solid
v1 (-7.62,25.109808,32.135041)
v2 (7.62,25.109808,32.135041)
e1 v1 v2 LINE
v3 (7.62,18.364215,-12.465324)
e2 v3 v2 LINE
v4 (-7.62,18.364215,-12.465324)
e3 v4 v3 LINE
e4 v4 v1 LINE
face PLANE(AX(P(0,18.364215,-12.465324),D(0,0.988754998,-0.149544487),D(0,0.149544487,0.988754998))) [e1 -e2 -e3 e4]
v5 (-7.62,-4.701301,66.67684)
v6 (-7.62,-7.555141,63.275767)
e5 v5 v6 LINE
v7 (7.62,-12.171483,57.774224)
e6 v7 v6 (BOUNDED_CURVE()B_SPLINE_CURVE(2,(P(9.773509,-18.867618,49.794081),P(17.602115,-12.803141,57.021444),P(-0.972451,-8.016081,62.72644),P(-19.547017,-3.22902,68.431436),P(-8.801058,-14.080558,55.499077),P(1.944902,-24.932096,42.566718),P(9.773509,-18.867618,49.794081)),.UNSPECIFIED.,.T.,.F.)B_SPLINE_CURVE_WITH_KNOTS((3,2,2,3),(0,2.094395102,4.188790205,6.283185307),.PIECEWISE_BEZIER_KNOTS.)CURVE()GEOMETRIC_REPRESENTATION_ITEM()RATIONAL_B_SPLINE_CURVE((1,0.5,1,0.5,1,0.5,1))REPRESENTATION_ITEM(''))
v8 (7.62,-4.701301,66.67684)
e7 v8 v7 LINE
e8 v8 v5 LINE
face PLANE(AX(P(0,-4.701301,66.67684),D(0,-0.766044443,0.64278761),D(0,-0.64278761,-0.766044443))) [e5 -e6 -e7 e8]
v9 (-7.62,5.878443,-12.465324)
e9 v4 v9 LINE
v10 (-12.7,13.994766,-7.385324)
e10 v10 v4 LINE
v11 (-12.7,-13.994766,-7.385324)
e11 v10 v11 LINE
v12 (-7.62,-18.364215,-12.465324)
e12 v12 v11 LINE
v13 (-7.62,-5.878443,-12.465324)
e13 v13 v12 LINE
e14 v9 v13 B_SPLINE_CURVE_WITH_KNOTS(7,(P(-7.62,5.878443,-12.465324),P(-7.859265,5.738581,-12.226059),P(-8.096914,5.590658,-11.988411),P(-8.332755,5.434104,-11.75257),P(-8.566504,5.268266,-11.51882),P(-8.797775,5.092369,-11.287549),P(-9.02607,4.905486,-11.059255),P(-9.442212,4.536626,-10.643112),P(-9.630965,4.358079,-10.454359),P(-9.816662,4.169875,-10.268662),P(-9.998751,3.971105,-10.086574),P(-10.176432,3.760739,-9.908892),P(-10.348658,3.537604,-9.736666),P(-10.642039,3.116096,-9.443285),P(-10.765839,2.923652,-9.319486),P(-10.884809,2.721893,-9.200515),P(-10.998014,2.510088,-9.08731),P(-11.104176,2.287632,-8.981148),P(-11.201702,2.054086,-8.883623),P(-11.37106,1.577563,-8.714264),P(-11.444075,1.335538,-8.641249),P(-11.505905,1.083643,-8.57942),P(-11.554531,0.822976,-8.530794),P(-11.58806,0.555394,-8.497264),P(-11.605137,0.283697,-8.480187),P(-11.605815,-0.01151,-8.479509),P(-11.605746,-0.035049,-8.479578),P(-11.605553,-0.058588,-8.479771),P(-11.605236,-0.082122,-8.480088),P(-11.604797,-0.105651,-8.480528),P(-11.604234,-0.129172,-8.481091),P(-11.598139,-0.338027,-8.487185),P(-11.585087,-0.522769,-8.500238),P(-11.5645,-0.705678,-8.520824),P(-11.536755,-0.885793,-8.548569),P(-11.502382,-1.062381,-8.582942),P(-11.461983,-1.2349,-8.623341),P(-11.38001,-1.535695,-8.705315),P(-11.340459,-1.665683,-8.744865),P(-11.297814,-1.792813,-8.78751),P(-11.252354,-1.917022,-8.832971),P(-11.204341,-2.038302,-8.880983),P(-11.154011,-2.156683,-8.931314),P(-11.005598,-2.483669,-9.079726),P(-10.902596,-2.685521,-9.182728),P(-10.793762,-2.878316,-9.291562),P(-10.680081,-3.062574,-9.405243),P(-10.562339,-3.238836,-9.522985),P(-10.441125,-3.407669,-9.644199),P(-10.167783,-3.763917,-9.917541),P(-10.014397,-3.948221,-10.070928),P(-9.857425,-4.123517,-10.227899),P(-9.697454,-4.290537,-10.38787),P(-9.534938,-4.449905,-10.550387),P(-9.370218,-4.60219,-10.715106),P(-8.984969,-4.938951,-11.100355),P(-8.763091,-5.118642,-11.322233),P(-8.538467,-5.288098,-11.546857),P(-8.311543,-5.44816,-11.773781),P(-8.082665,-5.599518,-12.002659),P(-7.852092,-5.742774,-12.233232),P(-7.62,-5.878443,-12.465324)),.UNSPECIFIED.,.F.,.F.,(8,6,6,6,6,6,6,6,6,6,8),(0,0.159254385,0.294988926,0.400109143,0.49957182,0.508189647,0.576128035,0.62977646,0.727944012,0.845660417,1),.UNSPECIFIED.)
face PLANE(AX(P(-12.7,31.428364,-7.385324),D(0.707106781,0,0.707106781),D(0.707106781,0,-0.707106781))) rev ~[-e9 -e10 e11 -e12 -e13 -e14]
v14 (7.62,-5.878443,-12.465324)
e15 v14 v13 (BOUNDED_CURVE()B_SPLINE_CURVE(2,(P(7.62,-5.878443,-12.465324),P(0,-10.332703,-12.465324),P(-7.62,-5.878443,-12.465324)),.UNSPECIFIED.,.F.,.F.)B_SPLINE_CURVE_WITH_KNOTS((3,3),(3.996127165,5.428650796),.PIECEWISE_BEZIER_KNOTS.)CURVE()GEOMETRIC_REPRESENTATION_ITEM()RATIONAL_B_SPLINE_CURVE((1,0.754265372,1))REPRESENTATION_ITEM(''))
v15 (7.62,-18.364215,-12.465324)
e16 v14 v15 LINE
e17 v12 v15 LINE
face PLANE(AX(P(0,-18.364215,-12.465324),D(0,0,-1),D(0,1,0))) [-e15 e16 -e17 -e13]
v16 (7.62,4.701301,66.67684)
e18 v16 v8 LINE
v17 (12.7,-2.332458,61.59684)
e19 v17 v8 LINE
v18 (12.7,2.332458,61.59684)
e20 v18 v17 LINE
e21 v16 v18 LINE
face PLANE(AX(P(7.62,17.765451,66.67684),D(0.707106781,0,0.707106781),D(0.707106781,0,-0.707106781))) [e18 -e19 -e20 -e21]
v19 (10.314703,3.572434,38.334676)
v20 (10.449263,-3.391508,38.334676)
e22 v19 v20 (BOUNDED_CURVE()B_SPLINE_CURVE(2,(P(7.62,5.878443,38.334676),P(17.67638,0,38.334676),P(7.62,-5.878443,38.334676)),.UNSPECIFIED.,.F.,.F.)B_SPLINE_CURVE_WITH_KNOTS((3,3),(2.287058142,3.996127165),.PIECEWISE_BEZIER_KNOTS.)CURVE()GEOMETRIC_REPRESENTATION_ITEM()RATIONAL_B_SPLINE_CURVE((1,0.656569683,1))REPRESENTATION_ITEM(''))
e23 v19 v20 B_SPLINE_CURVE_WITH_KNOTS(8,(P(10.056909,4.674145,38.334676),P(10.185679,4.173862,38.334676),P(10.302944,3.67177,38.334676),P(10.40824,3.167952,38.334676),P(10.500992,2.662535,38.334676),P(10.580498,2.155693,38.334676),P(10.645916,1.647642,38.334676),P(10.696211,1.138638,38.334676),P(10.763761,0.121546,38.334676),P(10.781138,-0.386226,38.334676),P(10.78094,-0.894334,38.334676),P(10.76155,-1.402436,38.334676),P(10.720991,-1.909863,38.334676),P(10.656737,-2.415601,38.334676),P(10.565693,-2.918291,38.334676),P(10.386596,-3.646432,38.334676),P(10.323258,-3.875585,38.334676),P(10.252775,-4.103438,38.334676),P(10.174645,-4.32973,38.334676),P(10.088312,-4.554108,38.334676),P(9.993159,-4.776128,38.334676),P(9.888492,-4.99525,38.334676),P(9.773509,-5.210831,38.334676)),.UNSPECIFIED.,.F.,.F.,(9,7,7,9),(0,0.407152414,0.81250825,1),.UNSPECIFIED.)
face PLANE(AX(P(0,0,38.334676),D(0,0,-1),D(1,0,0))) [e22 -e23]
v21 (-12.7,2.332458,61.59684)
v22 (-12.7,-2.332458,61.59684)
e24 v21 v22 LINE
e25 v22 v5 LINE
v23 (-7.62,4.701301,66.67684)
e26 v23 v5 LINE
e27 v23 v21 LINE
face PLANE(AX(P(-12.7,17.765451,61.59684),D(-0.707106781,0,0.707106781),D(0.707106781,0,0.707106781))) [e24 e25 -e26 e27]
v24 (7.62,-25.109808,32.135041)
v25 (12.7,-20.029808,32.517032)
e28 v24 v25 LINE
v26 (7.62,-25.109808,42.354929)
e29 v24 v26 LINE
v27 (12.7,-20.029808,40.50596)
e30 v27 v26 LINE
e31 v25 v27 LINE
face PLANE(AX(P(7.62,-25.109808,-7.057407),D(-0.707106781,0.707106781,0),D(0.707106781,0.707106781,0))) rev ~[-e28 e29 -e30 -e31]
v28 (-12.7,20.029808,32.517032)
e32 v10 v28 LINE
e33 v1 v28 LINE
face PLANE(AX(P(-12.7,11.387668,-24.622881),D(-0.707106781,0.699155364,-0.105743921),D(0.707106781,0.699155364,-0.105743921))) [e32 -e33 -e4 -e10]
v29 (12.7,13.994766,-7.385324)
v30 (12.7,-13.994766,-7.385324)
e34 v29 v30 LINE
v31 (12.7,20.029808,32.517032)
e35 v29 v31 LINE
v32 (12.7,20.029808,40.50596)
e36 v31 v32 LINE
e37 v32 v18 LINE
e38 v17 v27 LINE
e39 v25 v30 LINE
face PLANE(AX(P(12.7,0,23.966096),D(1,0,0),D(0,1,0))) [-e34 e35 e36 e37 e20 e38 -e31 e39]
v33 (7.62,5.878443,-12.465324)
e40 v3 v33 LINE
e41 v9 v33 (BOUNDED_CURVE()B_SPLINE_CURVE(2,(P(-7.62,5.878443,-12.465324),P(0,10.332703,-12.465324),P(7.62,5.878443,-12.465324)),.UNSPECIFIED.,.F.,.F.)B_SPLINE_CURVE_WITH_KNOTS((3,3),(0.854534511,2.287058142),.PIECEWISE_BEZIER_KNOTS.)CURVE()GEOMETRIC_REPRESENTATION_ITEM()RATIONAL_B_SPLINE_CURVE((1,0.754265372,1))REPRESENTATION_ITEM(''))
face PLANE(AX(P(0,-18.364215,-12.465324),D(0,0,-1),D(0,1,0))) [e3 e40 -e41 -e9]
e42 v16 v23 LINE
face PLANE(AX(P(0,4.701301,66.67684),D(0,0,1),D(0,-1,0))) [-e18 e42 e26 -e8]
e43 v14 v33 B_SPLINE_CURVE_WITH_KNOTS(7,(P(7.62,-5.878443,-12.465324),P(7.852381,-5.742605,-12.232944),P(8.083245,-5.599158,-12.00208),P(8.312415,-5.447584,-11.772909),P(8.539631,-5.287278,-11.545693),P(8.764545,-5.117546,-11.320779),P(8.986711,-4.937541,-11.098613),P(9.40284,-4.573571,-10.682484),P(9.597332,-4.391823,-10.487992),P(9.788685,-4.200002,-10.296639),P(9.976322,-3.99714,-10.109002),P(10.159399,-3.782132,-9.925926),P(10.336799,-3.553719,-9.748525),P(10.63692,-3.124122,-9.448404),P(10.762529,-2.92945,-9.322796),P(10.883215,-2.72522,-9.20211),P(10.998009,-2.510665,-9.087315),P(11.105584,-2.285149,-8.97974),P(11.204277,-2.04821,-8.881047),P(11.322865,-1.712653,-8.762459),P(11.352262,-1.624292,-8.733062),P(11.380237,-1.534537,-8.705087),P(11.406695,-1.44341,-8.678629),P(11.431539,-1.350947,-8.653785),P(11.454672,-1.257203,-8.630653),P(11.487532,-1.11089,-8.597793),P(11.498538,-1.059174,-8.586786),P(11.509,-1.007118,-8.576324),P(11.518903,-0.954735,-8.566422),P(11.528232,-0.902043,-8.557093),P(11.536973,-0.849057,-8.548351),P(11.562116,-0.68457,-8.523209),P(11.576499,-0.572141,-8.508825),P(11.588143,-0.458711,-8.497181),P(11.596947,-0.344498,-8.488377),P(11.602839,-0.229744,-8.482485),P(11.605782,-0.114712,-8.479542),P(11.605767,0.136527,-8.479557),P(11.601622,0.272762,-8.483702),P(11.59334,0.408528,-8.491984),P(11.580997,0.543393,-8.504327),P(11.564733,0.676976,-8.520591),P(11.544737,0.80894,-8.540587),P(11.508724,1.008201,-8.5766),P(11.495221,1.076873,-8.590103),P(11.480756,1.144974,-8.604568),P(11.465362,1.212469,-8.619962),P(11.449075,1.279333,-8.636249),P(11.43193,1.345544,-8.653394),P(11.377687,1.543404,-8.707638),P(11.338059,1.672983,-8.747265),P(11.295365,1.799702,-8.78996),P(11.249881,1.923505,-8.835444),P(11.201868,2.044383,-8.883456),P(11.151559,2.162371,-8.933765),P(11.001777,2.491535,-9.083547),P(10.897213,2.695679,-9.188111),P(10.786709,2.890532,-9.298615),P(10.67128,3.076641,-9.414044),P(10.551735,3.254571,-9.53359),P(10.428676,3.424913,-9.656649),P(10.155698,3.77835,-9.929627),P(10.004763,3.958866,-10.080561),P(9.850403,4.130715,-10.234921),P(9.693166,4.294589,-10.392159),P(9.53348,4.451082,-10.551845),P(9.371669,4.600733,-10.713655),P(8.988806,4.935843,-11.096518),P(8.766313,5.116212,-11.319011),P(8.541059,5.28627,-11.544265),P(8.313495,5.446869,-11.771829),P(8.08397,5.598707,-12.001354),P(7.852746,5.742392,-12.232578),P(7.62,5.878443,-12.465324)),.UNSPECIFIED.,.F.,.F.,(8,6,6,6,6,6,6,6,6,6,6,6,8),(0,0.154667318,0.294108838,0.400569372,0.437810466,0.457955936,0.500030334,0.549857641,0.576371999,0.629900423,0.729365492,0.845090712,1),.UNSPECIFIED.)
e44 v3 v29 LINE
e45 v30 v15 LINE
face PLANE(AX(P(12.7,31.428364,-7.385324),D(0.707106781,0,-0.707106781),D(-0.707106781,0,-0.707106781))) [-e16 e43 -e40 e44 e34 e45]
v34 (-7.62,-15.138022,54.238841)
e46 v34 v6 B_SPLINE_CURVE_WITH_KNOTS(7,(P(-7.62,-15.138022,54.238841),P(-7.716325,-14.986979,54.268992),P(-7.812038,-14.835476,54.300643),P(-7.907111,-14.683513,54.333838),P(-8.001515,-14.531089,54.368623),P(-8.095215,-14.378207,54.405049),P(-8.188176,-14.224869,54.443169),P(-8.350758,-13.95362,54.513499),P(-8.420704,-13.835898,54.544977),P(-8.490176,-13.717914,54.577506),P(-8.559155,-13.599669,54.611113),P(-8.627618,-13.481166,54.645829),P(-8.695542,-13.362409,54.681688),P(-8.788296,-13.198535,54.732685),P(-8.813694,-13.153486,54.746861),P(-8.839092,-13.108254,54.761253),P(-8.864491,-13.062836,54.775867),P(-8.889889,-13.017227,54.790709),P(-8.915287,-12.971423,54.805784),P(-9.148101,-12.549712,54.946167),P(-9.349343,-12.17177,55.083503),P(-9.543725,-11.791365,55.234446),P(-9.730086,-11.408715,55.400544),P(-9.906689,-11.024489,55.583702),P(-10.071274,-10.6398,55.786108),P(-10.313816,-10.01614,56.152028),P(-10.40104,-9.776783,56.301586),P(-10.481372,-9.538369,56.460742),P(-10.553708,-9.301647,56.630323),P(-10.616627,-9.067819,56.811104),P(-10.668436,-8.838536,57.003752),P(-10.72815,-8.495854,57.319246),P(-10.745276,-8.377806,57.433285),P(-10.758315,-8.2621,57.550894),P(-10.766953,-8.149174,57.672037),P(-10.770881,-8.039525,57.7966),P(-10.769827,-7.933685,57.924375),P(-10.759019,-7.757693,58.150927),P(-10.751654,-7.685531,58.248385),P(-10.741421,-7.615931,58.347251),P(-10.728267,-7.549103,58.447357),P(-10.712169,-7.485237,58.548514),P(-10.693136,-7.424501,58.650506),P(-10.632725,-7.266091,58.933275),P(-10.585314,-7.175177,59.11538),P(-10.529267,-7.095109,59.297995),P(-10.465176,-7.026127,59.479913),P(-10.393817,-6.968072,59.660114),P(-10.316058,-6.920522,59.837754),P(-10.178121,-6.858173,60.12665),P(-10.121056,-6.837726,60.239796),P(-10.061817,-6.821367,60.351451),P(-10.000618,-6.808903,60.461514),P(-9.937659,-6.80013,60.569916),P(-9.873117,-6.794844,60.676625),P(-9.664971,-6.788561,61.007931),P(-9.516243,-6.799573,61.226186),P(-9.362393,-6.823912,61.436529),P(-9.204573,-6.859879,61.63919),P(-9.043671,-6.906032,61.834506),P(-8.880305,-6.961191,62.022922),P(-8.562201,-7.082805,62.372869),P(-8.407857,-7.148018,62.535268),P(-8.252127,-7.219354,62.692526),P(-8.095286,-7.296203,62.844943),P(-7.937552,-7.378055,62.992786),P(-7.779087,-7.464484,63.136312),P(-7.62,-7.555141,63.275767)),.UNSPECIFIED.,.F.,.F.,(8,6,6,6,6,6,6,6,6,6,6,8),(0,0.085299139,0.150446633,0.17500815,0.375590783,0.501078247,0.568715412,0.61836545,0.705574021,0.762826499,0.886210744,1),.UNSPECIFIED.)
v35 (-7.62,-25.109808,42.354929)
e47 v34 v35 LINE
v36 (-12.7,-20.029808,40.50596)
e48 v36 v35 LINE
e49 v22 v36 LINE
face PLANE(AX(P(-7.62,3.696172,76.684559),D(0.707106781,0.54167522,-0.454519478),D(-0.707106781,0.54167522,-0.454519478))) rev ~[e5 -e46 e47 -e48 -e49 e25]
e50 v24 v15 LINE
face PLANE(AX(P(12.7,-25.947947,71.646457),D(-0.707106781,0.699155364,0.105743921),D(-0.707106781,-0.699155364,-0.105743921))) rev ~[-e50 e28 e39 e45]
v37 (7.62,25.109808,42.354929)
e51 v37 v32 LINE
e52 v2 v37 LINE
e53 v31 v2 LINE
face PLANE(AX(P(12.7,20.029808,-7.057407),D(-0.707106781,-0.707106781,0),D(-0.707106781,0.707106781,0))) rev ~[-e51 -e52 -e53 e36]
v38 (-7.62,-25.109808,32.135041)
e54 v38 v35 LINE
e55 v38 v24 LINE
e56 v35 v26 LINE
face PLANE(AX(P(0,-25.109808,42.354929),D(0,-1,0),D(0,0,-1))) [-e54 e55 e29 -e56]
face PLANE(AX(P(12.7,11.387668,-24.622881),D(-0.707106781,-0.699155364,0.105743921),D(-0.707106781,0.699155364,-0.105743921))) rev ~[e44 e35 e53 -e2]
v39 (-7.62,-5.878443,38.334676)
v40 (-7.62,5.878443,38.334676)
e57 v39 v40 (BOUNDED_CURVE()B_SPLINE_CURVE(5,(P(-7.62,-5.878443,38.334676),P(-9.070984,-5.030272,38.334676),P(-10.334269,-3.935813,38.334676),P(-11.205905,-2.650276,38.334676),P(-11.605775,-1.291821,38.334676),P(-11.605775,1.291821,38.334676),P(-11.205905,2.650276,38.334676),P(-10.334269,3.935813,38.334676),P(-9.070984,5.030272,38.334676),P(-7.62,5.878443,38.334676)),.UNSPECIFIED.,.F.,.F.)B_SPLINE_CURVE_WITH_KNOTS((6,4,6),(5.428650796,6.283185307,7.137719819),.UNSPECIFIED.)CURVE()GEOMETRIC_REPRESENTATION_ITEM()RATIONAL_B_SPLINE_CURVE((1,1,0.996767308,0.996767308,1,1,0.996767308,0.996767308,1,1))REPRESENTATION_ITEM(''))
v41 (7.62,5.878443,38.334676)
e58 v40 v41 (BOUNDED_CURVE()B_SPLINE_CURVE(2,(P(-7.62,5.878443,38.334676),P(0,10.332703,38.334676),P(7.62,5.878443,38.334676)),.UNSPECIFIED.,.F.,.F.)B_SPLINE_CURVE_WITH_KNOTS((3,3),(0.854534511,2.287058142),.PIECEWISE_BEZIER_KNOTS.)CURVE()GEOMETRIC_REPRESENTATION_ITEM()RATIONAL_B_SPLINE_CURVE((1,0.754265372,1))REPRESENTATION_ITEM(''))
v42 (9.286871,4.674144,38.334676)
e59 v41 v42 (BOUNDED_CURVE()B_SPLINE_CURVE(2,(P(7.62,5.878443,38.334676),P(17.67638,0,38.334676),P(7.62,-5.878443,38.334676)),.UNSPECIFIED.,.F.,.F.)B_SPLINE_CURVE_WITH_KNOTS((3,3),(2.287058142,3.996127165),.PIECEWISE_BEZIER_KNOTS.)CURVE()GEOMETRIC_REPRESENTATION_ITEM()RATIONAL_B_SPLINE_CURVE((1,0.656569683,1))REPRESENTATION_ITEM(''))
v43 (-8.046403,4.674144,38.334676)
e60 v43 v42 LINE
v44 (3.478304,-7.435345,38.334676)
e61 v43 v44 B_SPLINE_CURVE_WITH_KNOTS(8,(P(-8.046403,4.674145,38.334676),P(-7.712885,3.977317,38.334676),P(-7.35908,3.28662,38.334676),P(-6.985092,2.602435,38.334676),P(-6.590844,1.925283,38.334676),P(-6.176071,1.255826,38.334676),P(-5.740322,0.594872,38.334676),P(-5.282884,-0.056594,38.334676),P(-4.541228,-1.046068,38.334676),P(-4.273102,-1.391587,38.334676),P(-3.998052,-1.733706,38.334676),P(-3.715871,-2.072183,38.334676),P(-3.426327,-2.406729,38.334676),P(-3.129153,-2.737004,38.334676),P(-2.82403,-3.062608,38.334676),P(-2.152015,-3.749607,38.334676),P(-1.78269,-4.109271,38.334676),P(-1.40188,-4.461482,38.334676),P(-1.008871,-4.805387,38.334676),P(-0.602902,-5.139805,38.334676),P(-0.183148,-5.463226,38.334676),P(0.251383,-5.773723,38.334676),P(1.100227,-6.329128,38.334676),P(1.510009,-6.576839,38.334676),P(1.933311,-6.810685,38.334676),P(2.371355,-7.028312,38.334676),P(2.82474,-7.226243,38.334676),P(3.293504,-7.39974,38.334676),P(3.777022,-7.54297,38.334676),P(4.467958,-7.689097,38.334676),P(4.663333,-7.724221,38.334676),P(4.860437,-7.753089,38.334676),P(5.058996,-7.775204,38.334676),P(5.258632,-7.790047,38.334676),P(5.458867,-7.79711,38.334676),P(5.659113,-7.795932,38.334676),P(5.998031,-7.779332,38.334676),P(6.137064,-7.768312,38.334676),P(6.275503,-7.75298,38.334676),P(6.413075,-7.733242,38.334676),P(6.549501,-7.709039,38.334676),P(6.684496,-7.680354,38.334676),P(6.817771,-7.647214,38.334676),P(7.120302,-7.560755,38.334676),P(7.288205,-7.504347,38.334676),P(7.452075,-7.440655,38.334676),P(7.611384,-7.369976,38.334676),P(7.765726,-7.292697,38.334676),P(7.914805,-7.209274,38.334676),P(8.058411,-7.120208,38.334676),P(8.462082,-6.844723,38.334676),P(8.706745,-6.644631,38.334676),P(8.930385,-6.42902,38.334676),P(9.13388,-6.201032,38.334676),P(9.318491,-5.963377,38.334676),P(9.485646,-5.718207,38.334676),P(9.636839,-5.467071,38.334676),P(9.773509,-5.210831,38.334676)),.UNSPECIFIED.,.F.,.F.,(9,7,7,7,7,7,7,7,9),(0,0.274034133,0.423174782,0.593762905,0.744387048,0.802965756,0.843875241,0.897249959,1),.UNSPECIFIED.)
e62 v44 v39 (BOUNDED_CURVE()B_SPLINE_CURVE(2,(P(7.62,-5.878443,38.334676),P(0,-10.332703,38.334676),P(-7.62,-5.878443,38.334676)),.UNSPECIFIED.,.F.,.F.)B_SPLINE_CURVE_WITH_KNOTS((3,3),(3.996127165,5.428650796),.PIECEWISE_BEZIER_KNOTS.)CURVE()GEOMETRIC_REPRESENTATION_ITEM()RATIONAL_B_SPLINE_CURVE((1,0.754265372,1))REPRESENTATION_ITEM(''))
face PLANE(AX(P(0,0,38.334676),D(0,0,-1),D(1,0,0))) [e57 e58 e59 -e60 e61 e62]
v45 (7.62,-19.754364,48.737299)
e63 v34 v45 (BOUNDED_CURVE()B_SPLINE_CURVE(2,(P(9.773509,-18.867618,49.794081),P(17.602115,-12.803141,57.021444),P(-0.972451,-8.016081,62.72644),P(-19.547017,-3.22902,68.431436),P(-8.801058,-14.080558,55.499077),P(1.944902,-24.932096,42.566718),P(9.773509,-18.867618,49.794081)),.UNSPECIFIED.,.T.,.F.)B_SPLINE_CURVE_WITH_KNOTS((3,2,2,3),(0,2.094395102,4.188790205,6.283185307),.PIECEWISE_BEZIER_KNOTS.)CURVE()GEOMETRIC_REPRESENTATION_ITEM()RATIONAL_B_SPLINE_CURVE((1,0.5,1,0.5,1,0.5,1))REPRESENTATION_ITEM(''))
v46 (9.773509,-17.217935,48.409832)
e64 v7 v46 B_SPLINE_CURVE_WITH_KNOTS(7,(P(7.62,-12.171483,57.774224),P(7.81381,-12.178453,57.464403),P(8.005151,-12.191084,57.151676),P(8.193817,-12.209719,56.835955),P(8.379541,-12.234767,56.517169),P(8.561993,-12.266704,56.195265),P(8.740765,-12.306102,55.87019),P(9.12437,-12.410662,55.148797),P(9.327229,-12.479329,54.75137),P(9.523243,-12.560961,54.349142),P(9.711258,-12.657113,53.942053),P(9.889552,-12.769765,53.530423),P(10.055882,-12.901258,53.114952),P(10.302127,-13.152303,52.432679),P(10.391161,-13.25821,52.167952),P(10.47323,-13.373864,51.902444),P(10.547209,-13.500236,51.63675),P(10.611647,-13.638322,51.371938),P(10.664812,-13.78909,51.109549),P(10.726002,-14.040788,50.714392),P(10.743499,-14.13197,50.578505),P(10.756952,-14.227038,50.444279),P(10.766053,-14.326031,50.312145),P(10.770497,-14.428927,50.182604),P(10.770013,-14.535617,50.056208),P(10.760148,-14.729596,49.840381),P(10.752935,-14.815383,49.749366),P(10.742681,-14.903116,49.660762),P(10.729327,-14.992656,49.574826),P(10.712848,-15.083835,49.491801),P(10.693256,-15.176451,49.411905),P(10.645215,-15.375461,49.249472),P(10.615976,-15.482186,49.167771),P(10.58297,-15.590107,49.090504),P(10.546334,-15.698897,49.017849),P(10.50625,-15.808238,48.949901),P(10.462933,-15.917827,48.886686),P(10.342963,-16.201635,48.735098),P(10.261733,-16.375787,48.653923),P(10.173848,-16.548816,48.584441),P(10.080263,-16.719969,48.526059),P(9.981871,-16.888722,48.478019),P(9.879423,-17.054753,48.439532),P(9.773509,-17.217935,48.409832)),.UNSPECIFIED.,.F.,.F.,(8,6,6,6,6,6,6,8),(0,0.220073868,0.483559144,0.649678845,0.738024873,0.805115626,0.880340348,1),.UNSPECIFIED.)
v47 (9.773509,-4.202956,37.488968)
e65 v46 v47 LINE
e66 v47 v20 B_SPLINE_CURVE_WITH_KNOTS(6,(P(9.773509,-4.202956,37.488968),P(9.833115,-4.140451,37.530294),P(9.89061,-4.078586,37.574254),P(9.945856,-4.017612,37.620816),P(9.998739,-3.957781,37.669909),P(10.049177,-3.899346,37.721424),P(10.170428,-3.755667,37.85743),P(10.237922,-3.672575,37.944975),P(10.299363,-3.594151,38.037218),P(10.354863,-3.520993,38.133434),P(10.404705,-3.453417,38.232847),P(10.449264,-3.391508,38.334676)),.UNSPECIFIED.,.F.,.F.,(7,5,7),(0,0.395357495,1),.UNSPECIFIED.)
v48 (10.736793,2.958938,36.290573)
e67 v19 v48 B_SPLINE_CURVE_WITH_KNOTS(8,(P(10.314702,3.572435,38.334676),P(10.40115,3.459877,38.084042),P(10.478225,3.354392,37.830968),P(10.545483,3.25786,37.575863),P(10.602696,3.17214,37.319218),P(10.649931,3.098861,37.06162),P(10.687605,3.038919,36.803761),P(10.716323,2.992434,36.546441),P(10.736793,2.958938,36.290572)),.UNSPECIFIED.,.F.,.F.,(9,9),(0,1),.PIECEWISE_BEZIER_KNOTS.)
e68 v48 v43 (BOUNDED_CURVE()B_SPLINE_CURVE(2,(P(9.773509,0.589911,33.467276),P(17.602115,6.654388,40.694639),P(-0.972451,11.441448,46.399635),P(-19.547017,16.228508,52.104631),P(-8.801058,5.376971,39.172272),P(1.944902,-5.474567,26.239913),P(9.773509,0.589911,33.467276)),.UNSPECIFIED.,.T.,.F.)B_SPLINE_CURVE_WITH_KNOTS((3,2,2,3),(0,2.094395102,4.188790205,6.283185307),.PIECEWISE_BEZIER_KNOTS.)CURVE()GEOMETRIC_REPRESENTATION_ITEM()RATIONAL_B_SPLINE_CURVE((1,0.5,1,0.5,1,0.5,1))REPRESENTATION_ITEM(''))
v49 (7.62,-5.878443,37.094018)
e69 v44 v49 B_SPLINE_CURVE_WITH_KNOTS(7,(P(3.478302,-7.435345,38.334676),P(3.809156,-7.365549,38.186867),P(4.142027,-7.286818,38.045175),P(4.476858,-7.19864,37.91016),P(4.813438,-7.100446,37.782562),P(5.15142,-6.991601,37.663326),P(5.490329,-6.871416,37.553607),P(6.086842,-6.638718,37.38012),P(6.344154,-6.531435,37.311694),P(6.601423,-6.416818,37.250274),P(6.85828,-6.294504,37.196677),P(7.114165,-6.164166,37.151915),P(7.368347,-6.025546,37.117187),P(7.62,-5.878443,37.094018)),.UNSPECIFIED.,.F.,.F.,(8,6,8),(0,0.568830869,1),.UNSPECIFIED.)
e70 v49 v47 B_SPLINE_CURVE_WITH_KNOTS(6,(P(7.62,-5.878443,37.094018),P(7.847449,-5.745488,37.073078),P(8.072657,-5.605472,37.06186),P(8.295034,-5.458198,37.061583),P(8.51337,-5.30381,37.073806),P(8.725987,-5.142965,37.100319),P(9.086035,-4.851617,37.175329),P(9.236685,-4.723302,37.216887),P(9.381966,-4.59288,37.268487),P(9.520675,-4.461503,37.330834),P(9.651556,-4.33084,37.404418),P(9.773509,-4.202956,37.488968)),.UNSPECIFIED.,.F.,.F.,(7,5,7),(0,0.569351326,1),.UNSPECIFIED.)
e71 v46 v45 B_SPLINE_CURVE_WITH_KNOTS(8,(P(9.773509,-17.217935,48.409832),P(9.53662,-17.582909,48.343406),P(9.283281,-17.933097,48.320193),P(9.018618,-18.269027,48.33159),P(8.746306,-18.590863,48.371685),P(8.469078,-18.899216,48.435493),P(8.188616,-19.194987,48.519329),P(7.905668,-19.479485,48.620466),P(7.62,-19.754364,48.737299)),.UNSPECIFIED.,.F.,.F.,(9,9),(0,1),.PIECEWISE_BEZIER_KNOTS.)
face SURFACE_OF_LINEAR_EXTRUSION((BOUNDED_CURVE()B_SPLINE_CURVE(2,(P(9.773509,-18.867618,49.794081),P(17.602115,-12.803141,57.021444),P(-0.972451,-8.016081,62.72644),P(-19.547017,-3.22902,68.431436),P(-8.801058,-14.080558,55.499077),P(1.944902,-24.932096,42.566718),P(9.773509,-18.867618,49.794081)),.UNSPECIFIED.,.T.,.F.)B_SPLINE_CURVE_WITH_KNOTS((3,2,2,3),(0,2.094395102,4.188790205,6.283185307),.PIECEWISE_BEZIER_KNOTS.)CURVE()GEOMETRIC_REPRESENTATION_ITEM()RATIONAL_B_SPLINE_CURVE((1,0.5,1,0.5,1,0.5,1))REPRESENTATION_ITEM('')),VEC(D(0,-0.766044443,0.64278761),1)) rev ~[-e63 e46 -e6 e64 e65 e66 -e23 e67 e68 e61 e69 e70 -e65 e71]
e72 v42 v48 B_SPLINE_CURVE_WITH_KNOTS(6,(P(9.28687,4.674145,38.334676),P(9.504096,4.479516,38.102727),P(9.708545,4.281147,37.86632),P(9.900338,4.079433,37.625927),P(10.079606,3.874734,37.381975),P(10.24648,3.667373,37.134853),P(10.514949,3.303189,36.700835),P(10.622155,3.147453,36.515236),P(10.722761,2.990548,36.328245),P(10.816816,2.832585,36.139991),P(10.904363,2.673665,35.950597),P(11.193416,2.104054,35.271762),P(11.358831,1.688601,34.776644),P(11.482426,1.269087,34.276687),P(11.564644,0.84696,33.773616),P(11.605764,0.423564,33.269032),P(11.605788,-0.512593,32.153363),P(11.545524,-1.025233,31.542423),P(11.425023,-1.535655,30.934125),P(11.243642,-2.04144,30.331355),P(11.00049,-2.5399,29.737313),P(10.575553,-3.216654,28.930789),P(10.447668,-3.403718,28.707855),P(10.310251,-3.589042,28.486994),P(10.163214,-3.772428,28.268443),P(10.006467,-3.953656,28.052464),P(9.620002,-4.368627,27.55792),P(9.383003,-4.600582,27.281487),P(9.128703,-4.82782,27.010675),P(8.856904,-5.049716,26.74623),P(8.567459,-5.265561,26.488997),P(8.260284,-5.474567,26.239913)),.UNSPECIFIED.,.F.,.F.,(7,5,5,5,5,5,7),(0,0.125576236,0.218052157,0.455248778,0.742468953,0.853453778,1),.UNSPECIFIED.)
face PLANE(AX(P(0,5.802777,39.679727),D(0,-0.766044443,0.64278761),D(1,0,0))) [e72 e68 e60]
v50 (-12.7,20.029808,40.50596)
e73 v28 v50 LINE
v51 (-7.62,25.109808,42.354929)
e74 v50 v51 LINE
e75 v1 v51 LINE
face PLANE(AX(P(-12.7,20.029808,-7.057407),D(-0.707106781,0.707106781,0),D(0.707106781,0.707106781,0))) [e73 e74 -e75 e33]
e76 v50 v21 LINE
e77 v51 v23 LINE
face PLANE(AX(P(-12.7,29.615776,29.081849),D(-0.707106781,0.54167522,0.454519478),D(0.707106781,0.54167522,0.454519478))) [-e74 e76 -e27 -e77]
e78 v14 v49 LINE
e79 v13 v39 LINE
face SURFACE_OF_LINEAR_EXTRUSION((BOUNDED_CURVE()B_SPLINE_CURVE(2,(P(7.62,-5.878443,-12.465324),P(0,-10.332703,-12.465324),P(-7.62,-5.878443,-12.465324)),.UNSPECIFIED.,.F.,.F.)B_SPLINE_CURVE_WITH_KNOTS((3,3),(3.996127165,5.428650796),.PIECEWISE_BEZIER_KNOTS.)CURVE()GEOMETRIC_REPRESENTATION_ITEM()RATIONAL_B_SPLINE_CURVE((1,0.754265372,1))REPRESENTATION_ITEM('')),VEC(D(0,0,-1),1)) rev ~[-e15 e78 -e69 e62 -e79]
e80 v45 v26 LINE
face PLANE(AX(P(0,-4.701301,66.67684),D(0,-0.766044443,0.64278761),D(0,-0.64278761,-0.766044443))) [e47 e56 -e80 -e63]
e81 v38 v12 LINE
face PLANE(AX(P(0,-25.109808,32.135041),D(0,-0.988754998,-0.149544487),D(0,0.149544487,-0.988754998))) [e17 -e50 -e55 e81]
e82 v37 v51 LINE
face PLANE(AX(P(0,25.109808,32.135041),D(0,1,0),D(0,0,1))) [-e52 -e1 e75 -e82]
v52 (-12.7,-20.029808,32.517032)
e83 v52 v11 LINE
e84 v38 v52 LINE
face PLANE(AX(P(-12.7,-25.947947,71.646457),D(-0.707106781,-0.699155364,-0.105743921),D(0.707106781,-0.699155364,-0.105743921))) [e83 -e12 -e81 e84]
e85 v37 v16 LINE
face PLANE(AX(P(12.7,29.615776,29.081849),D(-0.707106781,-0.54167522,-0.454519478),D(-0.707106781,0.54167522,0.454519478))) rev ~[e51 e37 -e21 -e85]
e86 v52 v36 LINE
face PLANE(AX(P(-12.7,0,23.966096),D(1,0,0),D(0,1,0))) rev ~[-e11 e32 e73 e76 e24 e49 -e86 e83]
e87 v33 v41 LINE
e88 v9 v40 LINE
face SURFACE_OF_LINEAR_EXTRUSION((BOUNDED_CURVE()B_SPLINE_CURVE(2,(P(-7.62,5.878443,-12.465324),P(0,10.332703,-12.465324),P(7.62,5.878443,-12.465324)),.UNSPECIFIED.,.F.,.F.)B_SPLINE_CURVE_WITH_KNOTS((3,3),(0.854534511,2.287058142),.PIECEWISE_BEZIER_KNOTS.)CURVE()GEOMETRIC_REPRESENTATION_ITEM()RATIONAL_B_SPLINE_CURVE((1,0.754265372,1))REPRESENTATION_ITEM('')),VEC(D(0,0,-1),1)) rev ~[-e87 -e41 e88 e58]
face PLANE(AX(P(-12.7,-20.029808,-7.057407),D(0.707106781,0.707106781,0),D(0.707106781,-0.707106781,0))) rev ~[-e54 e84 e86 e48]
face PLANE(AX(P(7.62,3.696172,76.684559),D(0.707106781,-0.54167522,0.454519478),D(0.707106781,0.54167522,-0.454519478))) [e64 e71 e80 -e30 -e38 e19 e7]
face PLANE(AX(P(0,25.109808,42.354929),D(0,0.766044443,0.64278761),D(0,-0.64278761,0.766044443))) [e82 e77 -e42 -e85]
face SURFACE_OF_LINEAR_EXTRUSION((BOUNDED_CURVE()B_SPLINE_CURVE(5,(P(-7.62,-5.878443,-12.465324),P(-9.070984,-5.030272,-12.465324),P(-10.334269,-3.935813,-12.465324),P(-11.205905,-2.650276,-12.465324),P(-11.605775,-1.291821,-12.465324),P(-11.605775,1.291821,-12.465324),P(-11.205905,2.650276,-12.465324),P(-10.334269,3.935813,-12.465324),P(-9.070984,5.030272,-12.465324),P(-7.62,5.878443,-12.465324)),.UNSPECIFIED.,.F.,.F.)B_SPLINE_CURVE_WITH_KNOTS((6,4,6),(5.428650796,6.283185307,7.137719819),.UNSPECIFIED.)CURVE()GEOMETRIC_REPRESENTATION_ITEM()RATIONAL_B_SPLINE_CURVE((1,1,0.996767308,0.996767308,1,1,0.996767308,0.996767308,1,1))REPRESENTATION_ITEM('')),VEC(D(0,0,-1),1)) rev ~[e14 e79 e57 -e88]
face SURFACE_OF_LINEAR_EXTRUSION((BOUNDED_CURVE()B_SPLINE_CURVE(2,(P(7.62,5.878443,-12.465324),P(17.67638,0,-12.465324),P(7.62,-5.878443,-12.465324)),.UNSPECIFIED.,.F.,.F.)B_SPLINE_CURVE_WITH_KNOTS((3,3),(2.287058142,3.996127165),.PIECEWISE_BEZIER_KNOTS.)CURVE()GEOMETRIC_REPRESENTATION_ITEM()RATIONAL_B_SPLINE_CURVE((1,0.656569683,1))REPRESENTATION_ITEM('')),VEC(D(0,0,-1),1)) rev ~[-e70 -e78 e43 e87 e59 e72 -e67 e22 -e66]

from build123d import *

# Parameters (mm, degrees)
F1_DEPTH     = 12.7
F3_DEPTH     = 25.4
F4_T1_DEPTH  = 57.8782991577
F4_T3_DEPTH  = 62.476485972
F4_T5_DEPTH  = 97.3641990785
F4_T7_DEPTH  = 35.5309018222
F4_T9_DEPTH  = 57.8782991577
F4_T11_DEPTH = 97.3641990785
F4_T13_DEPTH = 62.8567289608
F6_DEPTH     = 50.8


# Not quite as in the source:
# - a fillet or chamfer that OpenCascade refuses, or shapes differently, is made with other operations: its cross-section is extruded or revolved along the edge and cut away or added


with BuildPart() as f1:
    # F0 (on Right) → F1 (new body, symmetric)
    with BuildSketch(Plane.YZ):
        Polygon((-4.7013013323, 66.6768401792), (-25.1098079398, 42.3549291102), (-25.1098079398, 32.1350414537), (-18.3642149015, -12.4653242528), (0, -12.4653242528), (18.3642149015, -12.4653242528), (25.1098079398, 32.1350414537), (25.1098079398, 42.3549291102), (4.7013013323, 66.6768401792), (0, 66.6768401792), align=None)
    extrude(amount=F1_DEPTH, both=True)

    # F2 (on face) → F3 (cut)
    with BuildSketch(Plane(origin=(0, -35.5907714481, 29.8642031954), x_dir=(1, 0, 0), z_dir=(0, -0.7660444431, 0.6427876097))):
        with BuildLine():
            add(Edge.make_bspline(
                [(9.7735087186, 26.016607844), (17.6021152344, 35.4512603932), (-0.9724511014, 42.8986037189), (-19.5470174373, 50.3459470446), (-8.8010576172, 33.4639511697), (1.9449022029, 16.5819552948), (9.7735087186, 26.016607844)],
                knots=[0, 0, 0, 2.0943951024, 2.0943951024, 4.1887902048, 4.1887902048, 6.2831853072, 6.2831853072, 6.2831853072], degree=2, weights=[1, 0.5, 1, 0.5, 1, 0.5, 1]))
        make_face()
    extrude(amount=-F3_DEPTH, mode=Mode.SUBTRACT)

    # F4: chamfer of 5.08 on 16 edges, made by hand

    # F4_s2 → F4_t1 (cut)
    with BuildSketch(Plane(origin=(0, 39.2869435962, 46.8203561728), x_dir=(1, 0, 0), z_dir=(0, -0.6427876097, -0.7660444431))):
        Polygon((7.62, 46.4604524813), (12.7, 41.3804524813), (12.7, 46.4604524813), align=None)
        Polygon((-7.62, 46.4604524813), (-12.7, 41.3804524813), (-12.7, 46.4604524813), align=None)
    extrude(amount=F4_T1_DEPTH, mode=Mode.SUBTRACT)

    # F4_s4 → F4_t3 (cut)
    with BuildSketch(Plane.XY.offset(-7.0574072829)):
        Polygon((7.62, -25.1098079398), (12.7, -20.0298079398), (12.7, -25.1098079398), align=None)
        Polygon((12.7, 20.0298079398), (7.62, 25.1098079398), (12.7, 25.1098079398), align=None)
        Polygon((-12.7, 20.0298079398), (-7.62, 25.1098079398), (-12.7, 25.1098079398), align=None)
        Polygon((-12.7, -20.0298079398), (-7.62, -25.1098079398), (-12.7, -25.1098079398), align=None)
    extrude(amount=F4_T3_DEPTH, mode=Mode.SUBTRACT)

    # F4_s6 → F4_t5 (cut)
    with BuildSketch(Plane(origin=(0, -11.1741383172, 73.8809253053), x_dir=(1, 0, 0), z_dir=(0, 0.1495444875, -0.9887549981))):
        Polygon((12.7, 14.9418297969), (7.62, 20.0218297969), (12.7, 20.0218297969), align=None)
        Polygon((-12.7, 14.9418297969), (-7.62, 20.0218297969), (-12.7, 20.0218297969), align=None)
    extrude(amount=F4_T5_DEPTH, mode=Mode.SUBTRACT)

    # F4_s8 → F4_t7 (cut)
    with BuildSketch(Plane.XZ.offset(-17.7654509111)):
        Polygon((7.62, 66.6768401792), (12.7, 61.5968401792), (12.7, 66.6768401792), align=None)
        Polygon((-12.7, 61.5968401792), (-7.62, 66.6768401792), (-12.7, 66.6768401792), align=None)
    extrude(amount=F4_T7_DEPTH, mode=Mode.SUBTRACT)

    # F4_s10 → F4_t9 (cut)
    with BuildSketch(Plane(origin=(0, -2.0834900279, 2.4830067258), x_dir=(1, 0, 0), z_dir=(0, -0.6427876097, 0.7660444431))):
        Polygon((12.7, 41.3804524813), (7.62, 46.4604524813), (12.7, 46.4604524813), align=None)
        Polygon((-12.7, 41.3804524813), (-7.62, 46.4604524813), (-12.7, 46.4604524813), align=None)
    extrude(amount=F4_T9_DEPTH, mode=Mode.SUBTRACT)

    # F4_s12 → F4_t11 (cut)
    with BuildSketch(Plane(origin=(0, -3.3861409345, -22.3884131691), x_dir=(1, 0, 0), z_dir=(0, 0.1495444875, 0.9887549981))):
        Polygon((12.7, 14.9418297969), (7.62, 20.0218297969), (12.7, 20.0218297969), align=None)
        Polygon((-12.7, 14.9418297969), (-7.62, 20.0218297969), (-12.7, 20.0218297969), align=None)
    extrude(amount=F4_T11_DEPTH, mode=Mode.SUBTRACT)

    # F4_s14 → F4_t13 (cut)
    with BuildSketch(Plane.XZ.offset(-31.4283644804)):
        Polygon((12.7, -7.3853242528), (7.62, -12.4653242528), (12.7, -12.4653242528), align=None)
        Polygon((-12.7, -7.3853242528), (-7.62, -12.4653242528), (-12.7, -12.4653242528), align=None)
    extrude(amount=F4_T13_DEPTH, mode=Mode.SUBTRACT)

    # F5 (on face) → F6 (cut)
    with BuildSketch(Plane(origin=(0, 0, -12.4653242528), x_dir=(1, 0, 0), z_dir=(0, 0, -1))):
        with BuildLine():
            Line((-7.62, 5.8784427825), (-7.62, -5.8784427825))
            add(Edge.make_bspline(
                [(-7.62, -5.8784427825), (0, -10.3327032159), (7.62, -5.8784427825)],
                knots=[0.8545345114, 0.8545345114, 0.8545345114, 2.2870581422, 2.2870581422, 2.2870581422], degree=2, weights=[1, 0.7542653721, 1]))
            Line((7.62, -5.8784427825), (7.62, 5.8784427825))
            add(Edge.make_bspline(
                [(7.62, 5.8784427825), (0, 10.3327032159), (-7.62, 5.8784427825)],
                knots=[3.9961271649, 3.9961271649, 3.9961271649, 5.4286507958, 5.4286507958, 5.4286507958], degree=2, weights=[1, 0.7542653721, 1]))
        make_face()
        with BuildLine():
            add(Edge.make_bspline(
                [(-7.62, 5.8784427825), (-11.6057749838, 3.5485635427), (-11.6057749838, 0)],
                knots=[5.4286507958, 5.4286507958, 5.4286507958, 6.2831853072, 6.2831853072, 6.2831853072], degree=2, weights=[1, 0.9101015555, 1]))
            add(Edge.make_bspline(
                [(-11.6057749838, 0), (-11.6057749838, -3.5485635427), (-7.62, -5.8784427825)],
                knots=[0, 0, 0, 0.8545345114, 0.8545345114, 0.8545345114], degree=2, weights=[1, 0.9101015555, 1]))
            Line((-7.62, -5.8784427825), (-7.62, 5.8784427825))
        make_face()
        with BuildLine():
            Line((7.62, 5.8784427825), (7.62, -5.8784427825))
            add(Edge.make_bspline(
                [(7.62, -5.8784427825), (17.6763796553, 0), (7.62, 5.8784427825)],
                knots=[2.2870581422, 2.2870581422, 2.2870581422, 3.9961271649, 3.9961271649, 3.9961271649], degree=2, weights=[1, 0.6565696828, 1]))
        make_face()
    extrude(amount=-F6_DEPTH, mode=Mode.SUBTRACT)


solid = f1.part
